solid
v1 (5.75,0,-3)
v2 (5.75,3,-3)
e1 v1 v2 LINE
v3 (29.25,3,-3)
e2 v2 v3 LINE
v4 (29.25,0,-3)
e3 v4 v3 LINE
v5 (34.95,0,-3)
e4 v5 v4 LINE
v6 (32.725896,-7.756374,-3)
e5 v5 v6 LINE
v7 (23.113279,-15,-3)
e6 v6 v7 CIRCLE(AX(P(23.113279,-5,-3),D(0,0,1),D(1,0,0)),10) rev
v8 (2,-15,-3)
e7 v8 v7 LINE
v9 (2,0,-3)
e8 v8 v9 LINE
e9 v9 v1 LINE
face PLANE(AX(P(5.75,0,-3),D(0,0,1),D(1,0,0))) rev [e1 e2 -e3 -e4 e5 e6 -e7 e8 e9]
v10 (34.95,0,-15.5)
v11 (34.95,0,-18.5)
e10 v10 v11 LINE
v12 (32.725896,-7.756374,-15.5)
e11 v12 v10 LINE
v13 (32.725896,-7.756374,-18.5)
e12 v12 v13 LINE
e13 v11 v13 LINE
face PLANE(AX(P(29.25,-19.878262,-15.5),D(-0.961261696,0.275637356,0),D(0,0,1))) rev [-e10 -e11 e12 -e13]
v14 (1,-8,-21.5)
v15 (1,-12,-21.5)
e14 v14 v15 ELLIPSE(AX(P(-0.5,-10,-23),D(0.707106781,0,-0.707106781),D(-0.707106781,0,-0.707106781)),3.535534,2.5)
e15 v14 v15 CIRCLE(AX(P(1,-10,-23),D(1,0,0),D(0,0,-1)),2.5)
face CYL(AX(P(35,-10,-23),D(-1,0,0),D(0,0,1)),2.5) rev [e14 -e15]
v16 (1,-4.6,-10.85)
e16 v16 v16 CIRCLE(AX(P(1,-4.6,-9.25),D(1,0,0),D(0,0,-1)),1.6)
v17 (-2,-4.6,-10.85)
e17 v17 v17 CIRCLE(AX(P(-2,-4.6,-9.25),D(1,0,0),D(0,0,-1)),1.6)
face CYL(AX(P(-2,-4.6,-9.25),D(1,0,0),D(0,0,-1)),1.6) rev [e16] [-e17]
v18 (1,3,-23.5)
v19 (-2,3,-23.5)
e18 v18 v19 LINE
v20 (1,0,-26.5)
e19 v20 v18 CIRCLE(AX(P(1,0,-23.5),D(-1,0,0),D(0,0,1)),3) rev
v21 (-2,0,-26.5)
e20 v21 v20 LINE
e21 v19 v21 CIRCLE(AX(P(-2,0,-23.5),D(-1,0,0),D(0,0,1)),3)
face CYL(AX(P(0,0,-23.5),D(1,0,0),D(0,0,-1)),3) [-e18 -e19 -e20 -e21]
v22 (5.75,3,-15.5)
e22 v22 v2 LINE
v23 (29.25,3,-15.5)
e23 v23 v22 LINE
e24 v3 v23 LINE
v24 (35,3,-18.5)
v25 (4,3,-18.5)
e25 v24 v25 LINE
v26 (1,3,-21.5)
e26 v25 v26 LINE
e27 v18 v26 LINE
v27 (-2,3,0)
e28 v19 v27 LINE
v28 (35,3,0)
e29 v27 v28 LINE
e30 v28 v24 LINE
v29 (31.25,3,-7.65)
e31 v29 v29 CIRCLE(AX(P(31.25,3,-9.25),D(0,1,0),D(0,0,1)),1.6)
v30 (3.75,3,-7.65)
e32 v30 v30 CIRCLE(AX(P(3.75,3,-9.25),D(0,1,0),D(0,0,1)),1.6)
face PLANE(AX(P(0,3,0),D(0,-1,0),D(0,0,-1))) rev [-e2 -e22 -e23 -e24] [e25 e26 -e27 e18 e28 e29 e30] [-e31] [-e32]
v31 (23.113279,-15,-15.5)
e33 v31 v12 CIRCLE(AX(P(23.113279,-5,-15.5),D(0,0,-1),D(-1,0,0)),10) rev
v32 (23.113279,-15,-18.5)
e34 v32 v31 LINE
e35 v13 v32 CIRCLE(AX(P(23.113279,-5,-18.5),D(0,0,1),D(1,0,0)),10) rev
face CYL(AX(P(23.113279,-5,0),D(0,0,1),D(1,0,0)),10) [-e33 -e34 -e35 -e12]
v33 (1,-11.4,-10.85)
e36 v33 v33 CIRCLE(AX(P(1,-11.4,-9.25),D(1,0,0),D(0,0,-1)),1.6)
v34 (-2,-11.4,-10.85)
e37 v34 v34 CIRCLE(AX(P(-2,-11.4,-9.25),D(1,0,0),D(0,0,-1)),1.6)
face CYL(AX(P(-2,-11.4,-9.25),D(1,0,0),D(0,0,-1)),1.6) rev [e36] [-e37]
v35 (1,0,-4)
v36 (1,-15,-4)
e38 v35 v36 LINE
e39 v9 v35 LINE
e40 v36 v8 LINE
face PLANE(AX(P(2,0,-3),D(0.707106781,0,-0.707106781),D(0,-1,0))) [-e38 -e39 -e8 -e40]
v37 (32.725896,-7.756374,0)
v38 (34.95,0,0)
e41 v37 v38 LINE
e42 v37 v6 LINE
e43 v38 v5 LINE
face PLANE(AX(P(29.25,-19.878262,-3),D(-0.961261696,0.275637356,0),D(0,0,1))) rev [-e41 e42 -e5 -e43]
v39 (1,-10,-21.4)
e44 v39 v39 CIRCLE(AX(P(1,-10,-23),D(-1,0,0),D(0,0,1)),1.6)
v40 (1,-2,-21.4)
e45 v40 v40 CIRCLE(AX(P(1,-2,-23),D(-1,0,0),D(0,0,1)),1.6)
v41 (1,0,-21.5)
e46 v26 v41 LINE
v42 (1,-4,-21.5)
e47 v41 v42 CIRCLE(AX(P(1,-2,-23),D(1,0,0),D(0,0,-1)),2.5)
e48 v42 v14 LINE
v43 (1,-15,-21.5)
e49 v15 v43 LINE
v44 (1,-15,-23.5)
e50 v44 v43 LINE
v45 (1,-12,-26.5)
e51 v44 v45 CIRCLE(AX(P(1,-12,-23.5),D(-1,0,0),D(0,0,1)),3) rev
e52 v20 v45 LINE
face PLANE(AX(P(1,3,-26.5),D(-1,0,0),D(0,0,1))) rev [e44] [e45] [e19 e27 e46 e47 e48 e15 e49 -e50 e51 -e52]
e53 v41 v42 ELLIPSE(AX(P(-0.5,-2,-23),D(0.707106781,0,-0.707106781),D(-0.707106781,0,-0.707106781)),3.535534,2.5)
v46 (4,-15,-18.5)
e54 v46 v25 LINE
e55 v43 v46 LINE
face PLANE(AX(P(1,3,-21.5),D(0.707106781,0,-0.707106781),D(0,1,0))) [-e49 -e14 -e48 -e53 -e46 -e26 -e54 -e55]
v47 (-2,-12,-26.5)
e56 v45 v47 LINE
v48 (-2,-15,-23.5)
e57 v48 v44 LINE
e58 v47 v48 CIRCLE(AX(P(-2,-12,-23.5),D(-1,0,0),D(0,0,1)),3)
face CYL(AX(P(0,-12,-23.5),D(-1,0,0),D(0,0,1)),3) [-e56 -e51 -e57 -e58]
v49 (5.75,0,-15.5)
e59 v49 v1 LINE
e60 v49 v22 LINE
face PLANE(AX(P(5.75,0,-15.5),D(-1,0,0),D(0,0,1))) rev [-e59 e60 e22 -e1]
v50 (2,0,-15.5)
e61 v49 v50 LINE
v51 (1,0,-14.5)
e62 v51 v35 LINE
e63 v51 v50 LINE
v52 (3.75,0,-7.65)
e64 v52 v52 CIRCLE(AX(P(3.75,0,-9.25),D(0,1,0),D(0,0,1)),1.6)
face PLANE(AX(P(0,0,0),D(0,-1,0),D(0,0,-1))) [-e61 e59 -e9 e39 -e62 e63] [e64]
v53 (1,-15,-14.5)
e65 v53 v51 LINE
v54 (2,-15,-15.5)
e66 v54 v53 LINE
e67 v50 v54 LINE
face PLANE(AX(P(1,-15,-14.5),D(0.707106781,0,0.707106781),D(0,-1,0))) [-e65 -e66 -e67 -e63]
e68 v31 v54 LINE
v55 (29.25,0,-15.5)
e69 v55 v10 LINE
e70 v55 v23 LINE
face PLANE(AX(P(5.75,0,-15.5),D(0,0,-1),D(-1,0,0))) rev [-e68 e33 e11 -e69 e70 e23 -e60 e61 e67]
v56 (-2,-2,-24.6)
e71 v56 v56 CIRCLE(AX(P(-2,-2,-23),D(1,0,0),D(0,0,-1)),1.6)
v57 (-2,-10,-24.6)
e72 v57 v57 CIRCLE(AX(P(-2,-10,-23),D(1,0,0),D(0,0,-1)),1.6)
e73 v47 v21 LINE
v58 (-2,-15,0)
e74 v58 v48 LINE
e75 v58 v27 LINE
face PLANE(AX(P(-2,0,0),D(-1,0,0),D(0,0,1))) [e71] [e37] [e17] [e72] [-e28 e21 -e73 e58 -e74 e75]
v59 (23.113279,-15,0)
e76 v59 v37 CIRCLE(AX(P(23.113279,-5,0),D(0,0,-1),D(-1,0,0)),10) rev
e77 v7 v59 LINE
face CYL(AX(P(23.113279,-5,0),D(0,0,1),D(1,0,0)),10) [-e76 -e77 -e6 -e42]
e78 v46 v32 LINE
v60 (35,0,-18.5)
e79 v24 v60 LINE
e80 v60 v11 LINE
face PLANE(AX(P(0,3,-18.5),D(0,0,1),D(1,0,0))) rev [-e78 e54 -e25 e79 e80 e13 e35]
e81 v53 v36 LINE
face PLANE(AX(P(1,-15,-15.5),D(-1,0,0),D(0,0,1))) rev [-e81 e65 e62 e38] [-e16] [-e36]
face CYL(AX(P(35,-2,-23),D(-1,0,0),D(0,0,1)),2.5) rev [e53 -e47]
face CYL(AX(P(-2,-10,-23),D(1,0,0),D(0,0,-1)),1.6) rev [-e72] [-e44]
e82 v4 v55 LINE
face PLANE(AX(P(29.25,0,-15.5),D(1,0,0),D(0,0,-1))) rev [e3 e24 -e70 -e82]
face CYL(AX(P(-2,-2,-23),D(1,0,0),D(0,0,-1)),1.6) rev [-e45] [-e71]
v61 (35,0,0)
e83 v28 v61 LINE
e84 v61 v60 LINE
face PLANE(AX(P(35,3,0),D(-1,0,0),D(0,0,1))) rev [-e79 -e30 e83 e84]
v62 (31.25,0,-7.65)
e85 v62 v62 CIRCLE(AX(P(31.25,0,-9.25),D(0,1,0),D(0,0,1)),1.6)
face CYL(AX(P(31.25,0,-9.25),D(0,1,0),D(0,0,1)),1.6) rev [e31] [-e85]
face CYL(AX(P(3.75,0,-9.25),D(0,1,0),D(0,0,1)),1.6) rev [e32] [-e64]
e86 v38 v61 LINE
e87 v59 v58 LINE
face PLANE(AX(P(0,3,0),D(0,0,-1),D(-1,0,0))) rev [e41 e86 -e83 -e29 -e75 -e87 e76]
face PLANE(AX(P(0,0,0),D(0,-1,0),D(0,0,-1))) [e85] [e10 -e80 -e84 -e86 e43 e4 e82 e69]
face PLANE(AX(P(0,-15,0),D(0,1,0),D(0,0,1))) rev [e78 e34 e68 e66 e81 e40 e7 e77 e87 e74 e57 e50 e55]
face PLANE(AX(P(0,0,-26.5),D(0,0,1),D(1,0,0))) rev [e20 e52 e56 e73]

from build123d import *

# Parameters (mm, degrees)
SKETCH_1_W               = 35
SKETCH_1_H               = 18.5
EXTRUDE_1_DEPTH          = 3
SKETCH_2_R               = 1.6
SKETCH_2_W               = 23.5
SKETCH_2_H               = 12.5
CUT_EXTRUDE_1_DEPTH      = 40.702015062
SKETCH_3_W               = 2
SKETCH_3_H               = 18.5
EXTRUDE_2_DEPTH          = 3
EXTRUDE_3_DEPTH          = 15
CHAMFER_1_SIZE           = 19.87826233
CHAMFER_1_SIZE_2         = 5.7
SKETCH_6_R               = 1.6
CUT_EXTRUDE_2_DEPTH      = 42.512046444
SKETCH_8_W               = 3
SKETCH_8_H               = 18
EXTRUDE_4_DEPTH          = 8
CHAMFER_2_SIZE           = 3
CUT_EXTRUDE_3_DEPTH      = 46.642633579
CUT_EXTRUDE_3_DEPTH_BACK = 46.642633579
SKETCH_10_R              = 1.6
SKETCH_11_R              = 2.5
CUT_EXTRUDE_4_DEPTH      = 46.642633579
FILLET_1_R               = 3
FILLET_2_R               = 10
CHAMFER_3_SIZE           = 1


with BuildPart() as part:
    # 草图1 → 凸台-拉伸1 (new body)
    with BuildSketch(Plane(origin=(0, 0, 0), x_dir=(1, 0, 0), z_dir=(0, 1, 0))):
        with Locations((17.5, 9.25)):
            Rectangle(SKETCH_1_W, SKETCH_1_H)
    extrude(amount=EXTRUDE_1_DEPTH)

    # 草图2 → 切除-拉伸1 (cut, through all)
    with BuildSketch(Plane(origin=(0, 3, 0), x_dir=(1, 0, 0), z_dir=(0, 1, 0))):
        with Locations(Location((3.75, 9.25, 0), (0, 0, 270))):
            Circle(SKETCH_2_R)
        with Locations(Location((31.25, 9.25, 0), (0, 0, 270))):
            Circle(SKETCH_2_R)
        with Locations((17.5, 9.25)):
            Rectangle(SKETCH_2_W, SKETCH_2_H)
    extrude(amount=-CUT_EXTRUDE_1_DEPTH, mode=Mode.SUBTRACT)

    # 草图3 → 凸台-拉伸2 (add)
    with BuildSketch(Plane(origin=(0, 3, 0), x_dir=(1, 0, 0), z_dir=(0, 1, 0))):
        with Locations((-1, 9.25)):
            Rectangle(SKETCH_3_W, SKETCH_3_H)
    extrude(amount=-EXTRUDE_2_DEPTH)

    # 草图5 → 凸台-拉伸3 (add)
    with BuildSketch(Plane(origin=(0, 0, 0), x_dir=(-1, 0, 0), z_dir=(0, -1, 0))):
        Polygon((-29.25, 15.5), (-1, 15.5), (-1, 3), (-29.25, 3), (-29.25, 0), (2, 0), (2, 3.75), (2, 16.25), (2, 18.5), (-29.25, 18.5), align=None)
    extrude(amount=EXTRUDE_3_DEPTH)

    # 倒角1
    # the kernel refuses this chamfer: 19.87826233, 5.7 mm, written as the material it adds along each edge
    with BuildSketch(Plane(origin=(29.25, 0, -18.5), x_dir=(-0.010616657410321141, -0.9999436417045873, 0), z_dir=(0, 0, 1))) as chamfer_1_piece_1_section:
        Polygon((CHAMFER_1_SIZE * 0.999943641699, CHAMFER_1_SIZE * 0.0106166574103), (-CHAMFER_1_SIZE_2 * 0.0106166574103, CHAMFER_1_SIZE_2 * 0.999943641705), (0, 0), align=None)
    chamfer_1_piece_1 = extrude(amount=3, mode=Mode.PRIVATE)
    chamfer_1_piece_1 = split(chamfer_1_piece_1, bisect_by=Plane(origin=(31.241878904, -15, -17), z_dir=(0, 1, 0)), keep=Keep.TOP, mode=Mode.PRIVATE)
    add(chamfer_1_piece_1)
    with BuildSketch(Plane(origin=(29.25, 0, -70.109385658), x_dir=(-0.010616657410321141, -0.9999436417045873, 0), z_dir=(0, 0, 1))) as chamfer_1_piece_2_section:
        Polygon((CHAMFER_1_SIZE * 0.999943641699, CHAMFER_1_SIZE * 0.0106166574103), (-CHAMFER_1_SIZE_2 * 0.0106166574103, CHAMFER_1_SIZE_2 * 0.999943641705), (0, 0), align=None)
    chamfer_1_piece_2 = extrude(amount=106.218771315, mode=Mode.PRIVATE)
    chamfer_1_piece_2 = split(chamfer_1_piece_2, bisect_by=Plane(origin=(31.241878904, -5.985247808, 0), z_dir=(0, 0, -1)), keep=Keep.TOP, mode=Mode.PRIVATE)
    chamfer_1_piece_2 = split(chamfer_1_piece_2, bisect_by=Plane(origin=(31.241878904, -5.985247808, -3), z_dir=(0, 0, 1)), keep=Keep.TOP, mode=Mode.PRIVATE)
    chamfer_1_piece_2 = split(chamfer_1_piece_2, bisect_by=Plane(origin=(31.241878904, -15, -1.5), z_dir=(0, 1, 0)), keep=Keep.TOP, mode=Mode.PRIVATE)
    add(chamfer_1_piece_2)
    with BuildSketch(Plane(origin=(29.25, 0, -54.609385658), x_dir=(-0.010616657410321141, -0.9999436417045873, 0), z_dir=(0, 0, 1))) as chamfer_1_piece_3_section:
        Polygon((CHAMFER_1_SIZE * 0.999943641699, CHAMFER_1_SIZE * 0.0106166574103), (-CHAMFER_1_SIZE_2 * 0.0106166574103, CHAMFER_1_SIZE_2 * 0.999943641705), (0, 0), align=None)
    chamfer_1_piece_3 = extrude(amount=106.218771315, mode=Mode.PRIVATE)
    chamfer_1_piece_3 = split(chamfer_1_piece_3, bisect_by=Plane(origin=(31.241878904, -5.985247808, -15.5), z_dir=(0, 0, -1)), keep=Keep.TOP, mode=Mode.PRIVATE)
    chamfer_1_piece_3 = split(chamfer_1_piece_3, bisect_by=Plane(origin=(31.241878904, -5.985247808, -18.5), z_dir=(0, 0, 1)), keep=Keep.TOP, mode=Mode.PRIVATE)
    chamfer_1_piece_3 = split(chamfer_1_piece_3, bisect_by=Plane(origin=(31.241878904, -15, -17), z_dir=(0, 1, 0)), keep=Keep.TOP, mode=Mode.PRIVATE)
    add(chamfer_1_piece_3)
    with BuildSketch(Plane(origin=(29.25, 0, -3), x_dir=(-0.010616657410321141, -0.9999436417045873, 0), z_dir=(0, 0, 1))) as chamfer_1_piece_4_section:
        Polygon((CHAMFER_1_SIZE * 0.999943641699, CHAMFER_1_SIZE * 0.0106166574103), (-CHAMFER_1_SIZE_2 * 0.0106166574103, CHAMFER_1_SIZE_2 * 0.999943641705), (0, 0), align=None)
    chamfer_1_piece_4 = extrude(amount=3, mode=Mode.PRIVATE)
    chamfer_1_piece_4 = split(chamfer_1_piece_4, bisect_by=Plane(origin=(31.241878904, -15, -1.5), z_dir=(0, 1, 0)), keep=Keep.TOP, mode=Mode.PRIVATE)
    add(chamfer_1_piece_4)

    # 草图6 → 切除-拉伸2 (cut, through all)
    with BuildSketch(Plane(origin=(1, 0, 0), x_dir=(0, 0, -1), z_dir=(1, 0, 0))):
        with Locations((9.25, -4.6)):
            Circle(SKETCH_6_R)
        with Locations((9.25, -11.4)):
            Circle(SKETCH_6_R)
    extrude(amount=-CUT_EXTRUDE_2_DEPTH, mode=Mode.SUBTRACT)

    # 草图8 → 凸台-拉伸4 (add)
    with BuildSketch(Plane(origin=(0, 0, -18.5), x_dir=(-1, 0, 0), z_dir=(0, 0, -1))):
        with Locations((0.5, -6)):
            Rectangle(SKETCH_8_W, SKETCH_8_H)
    extrude(amount=EXTRUDE_4_DEPTH)

    # 倒角2
    chamfer_2_edges = [part.edges().sort_by_distance(p)[0] for p in [
        (1, -6, -18.5),
    ]]
    chamfer(chamfer_2_edges, length=CHAMFER_2_SIZE)

    # 草图10 → 切除-拉伸3 (cut, two sides: drawn at the far end of the back side and taken through both)
    with BuildSketch(Plane(origin=(1, 0, 0), x_dir=(0, 0, -1), z_dir=(1, 0, 0)).offset(-CUT_EXTRUDE_3_DEPTH_BACK)):
        with Locations((23, -2)):
            Circle(SKETCH_10_R)
        with Locations((23, -10)):
            Circle(SKETCH_10_R)
    extrude(amount=CUT_EXTRUDE_3_DEPTH + CUT_EXTRUDE_3_DEPTH_BACK, mode=Mode.SUBTRACT)

    # 草图11 → 切除-拉伸4 (cut, through all)
    with BuildSketch(Plane(origin=(1, 0, 0), x_dir=(0, 0, -1), z_dir=(1, 0, 0))):
        with Locations((23, -2)):
            Circle(SKETCH_11_R)
        with Locations((23, -10)):
            Circle(SKETCH_11_R)
    extrude(amount=CUT_EXTRUDE_4_DEPTH, mode=Mode.SUBTRACT)

    # 圆角1
    fillet_1_edges = [part.edges().sort_by_distance(p)[0] for p in [
        (-0.5, 3, -26.5),
        (-0.5, -15, -26.5),
    ]]
    fillet(fillet_1_edges, radius=FILLET_1_R)

    # 圆角2
    fillet_2_edges = [part.edges().sort_by_distance(p)[0] for p in [
        (30.648819214, -15, -17),
        (30.648819214, -15, -1.5),
    ]]
    fillet(fillet_2_edges, radius=FILLET_2_R)

    # 倒角3
    chamfer_3_edges = [part.edges().sort_by_distance(p)[0] for p in [
        (1, -7.5, -15.5),
        (1, -7.5, -3),
    ]]
    chamfer(chamfer_3_edges, length=CHAMFER_3_SIZE)


solid = part.part
